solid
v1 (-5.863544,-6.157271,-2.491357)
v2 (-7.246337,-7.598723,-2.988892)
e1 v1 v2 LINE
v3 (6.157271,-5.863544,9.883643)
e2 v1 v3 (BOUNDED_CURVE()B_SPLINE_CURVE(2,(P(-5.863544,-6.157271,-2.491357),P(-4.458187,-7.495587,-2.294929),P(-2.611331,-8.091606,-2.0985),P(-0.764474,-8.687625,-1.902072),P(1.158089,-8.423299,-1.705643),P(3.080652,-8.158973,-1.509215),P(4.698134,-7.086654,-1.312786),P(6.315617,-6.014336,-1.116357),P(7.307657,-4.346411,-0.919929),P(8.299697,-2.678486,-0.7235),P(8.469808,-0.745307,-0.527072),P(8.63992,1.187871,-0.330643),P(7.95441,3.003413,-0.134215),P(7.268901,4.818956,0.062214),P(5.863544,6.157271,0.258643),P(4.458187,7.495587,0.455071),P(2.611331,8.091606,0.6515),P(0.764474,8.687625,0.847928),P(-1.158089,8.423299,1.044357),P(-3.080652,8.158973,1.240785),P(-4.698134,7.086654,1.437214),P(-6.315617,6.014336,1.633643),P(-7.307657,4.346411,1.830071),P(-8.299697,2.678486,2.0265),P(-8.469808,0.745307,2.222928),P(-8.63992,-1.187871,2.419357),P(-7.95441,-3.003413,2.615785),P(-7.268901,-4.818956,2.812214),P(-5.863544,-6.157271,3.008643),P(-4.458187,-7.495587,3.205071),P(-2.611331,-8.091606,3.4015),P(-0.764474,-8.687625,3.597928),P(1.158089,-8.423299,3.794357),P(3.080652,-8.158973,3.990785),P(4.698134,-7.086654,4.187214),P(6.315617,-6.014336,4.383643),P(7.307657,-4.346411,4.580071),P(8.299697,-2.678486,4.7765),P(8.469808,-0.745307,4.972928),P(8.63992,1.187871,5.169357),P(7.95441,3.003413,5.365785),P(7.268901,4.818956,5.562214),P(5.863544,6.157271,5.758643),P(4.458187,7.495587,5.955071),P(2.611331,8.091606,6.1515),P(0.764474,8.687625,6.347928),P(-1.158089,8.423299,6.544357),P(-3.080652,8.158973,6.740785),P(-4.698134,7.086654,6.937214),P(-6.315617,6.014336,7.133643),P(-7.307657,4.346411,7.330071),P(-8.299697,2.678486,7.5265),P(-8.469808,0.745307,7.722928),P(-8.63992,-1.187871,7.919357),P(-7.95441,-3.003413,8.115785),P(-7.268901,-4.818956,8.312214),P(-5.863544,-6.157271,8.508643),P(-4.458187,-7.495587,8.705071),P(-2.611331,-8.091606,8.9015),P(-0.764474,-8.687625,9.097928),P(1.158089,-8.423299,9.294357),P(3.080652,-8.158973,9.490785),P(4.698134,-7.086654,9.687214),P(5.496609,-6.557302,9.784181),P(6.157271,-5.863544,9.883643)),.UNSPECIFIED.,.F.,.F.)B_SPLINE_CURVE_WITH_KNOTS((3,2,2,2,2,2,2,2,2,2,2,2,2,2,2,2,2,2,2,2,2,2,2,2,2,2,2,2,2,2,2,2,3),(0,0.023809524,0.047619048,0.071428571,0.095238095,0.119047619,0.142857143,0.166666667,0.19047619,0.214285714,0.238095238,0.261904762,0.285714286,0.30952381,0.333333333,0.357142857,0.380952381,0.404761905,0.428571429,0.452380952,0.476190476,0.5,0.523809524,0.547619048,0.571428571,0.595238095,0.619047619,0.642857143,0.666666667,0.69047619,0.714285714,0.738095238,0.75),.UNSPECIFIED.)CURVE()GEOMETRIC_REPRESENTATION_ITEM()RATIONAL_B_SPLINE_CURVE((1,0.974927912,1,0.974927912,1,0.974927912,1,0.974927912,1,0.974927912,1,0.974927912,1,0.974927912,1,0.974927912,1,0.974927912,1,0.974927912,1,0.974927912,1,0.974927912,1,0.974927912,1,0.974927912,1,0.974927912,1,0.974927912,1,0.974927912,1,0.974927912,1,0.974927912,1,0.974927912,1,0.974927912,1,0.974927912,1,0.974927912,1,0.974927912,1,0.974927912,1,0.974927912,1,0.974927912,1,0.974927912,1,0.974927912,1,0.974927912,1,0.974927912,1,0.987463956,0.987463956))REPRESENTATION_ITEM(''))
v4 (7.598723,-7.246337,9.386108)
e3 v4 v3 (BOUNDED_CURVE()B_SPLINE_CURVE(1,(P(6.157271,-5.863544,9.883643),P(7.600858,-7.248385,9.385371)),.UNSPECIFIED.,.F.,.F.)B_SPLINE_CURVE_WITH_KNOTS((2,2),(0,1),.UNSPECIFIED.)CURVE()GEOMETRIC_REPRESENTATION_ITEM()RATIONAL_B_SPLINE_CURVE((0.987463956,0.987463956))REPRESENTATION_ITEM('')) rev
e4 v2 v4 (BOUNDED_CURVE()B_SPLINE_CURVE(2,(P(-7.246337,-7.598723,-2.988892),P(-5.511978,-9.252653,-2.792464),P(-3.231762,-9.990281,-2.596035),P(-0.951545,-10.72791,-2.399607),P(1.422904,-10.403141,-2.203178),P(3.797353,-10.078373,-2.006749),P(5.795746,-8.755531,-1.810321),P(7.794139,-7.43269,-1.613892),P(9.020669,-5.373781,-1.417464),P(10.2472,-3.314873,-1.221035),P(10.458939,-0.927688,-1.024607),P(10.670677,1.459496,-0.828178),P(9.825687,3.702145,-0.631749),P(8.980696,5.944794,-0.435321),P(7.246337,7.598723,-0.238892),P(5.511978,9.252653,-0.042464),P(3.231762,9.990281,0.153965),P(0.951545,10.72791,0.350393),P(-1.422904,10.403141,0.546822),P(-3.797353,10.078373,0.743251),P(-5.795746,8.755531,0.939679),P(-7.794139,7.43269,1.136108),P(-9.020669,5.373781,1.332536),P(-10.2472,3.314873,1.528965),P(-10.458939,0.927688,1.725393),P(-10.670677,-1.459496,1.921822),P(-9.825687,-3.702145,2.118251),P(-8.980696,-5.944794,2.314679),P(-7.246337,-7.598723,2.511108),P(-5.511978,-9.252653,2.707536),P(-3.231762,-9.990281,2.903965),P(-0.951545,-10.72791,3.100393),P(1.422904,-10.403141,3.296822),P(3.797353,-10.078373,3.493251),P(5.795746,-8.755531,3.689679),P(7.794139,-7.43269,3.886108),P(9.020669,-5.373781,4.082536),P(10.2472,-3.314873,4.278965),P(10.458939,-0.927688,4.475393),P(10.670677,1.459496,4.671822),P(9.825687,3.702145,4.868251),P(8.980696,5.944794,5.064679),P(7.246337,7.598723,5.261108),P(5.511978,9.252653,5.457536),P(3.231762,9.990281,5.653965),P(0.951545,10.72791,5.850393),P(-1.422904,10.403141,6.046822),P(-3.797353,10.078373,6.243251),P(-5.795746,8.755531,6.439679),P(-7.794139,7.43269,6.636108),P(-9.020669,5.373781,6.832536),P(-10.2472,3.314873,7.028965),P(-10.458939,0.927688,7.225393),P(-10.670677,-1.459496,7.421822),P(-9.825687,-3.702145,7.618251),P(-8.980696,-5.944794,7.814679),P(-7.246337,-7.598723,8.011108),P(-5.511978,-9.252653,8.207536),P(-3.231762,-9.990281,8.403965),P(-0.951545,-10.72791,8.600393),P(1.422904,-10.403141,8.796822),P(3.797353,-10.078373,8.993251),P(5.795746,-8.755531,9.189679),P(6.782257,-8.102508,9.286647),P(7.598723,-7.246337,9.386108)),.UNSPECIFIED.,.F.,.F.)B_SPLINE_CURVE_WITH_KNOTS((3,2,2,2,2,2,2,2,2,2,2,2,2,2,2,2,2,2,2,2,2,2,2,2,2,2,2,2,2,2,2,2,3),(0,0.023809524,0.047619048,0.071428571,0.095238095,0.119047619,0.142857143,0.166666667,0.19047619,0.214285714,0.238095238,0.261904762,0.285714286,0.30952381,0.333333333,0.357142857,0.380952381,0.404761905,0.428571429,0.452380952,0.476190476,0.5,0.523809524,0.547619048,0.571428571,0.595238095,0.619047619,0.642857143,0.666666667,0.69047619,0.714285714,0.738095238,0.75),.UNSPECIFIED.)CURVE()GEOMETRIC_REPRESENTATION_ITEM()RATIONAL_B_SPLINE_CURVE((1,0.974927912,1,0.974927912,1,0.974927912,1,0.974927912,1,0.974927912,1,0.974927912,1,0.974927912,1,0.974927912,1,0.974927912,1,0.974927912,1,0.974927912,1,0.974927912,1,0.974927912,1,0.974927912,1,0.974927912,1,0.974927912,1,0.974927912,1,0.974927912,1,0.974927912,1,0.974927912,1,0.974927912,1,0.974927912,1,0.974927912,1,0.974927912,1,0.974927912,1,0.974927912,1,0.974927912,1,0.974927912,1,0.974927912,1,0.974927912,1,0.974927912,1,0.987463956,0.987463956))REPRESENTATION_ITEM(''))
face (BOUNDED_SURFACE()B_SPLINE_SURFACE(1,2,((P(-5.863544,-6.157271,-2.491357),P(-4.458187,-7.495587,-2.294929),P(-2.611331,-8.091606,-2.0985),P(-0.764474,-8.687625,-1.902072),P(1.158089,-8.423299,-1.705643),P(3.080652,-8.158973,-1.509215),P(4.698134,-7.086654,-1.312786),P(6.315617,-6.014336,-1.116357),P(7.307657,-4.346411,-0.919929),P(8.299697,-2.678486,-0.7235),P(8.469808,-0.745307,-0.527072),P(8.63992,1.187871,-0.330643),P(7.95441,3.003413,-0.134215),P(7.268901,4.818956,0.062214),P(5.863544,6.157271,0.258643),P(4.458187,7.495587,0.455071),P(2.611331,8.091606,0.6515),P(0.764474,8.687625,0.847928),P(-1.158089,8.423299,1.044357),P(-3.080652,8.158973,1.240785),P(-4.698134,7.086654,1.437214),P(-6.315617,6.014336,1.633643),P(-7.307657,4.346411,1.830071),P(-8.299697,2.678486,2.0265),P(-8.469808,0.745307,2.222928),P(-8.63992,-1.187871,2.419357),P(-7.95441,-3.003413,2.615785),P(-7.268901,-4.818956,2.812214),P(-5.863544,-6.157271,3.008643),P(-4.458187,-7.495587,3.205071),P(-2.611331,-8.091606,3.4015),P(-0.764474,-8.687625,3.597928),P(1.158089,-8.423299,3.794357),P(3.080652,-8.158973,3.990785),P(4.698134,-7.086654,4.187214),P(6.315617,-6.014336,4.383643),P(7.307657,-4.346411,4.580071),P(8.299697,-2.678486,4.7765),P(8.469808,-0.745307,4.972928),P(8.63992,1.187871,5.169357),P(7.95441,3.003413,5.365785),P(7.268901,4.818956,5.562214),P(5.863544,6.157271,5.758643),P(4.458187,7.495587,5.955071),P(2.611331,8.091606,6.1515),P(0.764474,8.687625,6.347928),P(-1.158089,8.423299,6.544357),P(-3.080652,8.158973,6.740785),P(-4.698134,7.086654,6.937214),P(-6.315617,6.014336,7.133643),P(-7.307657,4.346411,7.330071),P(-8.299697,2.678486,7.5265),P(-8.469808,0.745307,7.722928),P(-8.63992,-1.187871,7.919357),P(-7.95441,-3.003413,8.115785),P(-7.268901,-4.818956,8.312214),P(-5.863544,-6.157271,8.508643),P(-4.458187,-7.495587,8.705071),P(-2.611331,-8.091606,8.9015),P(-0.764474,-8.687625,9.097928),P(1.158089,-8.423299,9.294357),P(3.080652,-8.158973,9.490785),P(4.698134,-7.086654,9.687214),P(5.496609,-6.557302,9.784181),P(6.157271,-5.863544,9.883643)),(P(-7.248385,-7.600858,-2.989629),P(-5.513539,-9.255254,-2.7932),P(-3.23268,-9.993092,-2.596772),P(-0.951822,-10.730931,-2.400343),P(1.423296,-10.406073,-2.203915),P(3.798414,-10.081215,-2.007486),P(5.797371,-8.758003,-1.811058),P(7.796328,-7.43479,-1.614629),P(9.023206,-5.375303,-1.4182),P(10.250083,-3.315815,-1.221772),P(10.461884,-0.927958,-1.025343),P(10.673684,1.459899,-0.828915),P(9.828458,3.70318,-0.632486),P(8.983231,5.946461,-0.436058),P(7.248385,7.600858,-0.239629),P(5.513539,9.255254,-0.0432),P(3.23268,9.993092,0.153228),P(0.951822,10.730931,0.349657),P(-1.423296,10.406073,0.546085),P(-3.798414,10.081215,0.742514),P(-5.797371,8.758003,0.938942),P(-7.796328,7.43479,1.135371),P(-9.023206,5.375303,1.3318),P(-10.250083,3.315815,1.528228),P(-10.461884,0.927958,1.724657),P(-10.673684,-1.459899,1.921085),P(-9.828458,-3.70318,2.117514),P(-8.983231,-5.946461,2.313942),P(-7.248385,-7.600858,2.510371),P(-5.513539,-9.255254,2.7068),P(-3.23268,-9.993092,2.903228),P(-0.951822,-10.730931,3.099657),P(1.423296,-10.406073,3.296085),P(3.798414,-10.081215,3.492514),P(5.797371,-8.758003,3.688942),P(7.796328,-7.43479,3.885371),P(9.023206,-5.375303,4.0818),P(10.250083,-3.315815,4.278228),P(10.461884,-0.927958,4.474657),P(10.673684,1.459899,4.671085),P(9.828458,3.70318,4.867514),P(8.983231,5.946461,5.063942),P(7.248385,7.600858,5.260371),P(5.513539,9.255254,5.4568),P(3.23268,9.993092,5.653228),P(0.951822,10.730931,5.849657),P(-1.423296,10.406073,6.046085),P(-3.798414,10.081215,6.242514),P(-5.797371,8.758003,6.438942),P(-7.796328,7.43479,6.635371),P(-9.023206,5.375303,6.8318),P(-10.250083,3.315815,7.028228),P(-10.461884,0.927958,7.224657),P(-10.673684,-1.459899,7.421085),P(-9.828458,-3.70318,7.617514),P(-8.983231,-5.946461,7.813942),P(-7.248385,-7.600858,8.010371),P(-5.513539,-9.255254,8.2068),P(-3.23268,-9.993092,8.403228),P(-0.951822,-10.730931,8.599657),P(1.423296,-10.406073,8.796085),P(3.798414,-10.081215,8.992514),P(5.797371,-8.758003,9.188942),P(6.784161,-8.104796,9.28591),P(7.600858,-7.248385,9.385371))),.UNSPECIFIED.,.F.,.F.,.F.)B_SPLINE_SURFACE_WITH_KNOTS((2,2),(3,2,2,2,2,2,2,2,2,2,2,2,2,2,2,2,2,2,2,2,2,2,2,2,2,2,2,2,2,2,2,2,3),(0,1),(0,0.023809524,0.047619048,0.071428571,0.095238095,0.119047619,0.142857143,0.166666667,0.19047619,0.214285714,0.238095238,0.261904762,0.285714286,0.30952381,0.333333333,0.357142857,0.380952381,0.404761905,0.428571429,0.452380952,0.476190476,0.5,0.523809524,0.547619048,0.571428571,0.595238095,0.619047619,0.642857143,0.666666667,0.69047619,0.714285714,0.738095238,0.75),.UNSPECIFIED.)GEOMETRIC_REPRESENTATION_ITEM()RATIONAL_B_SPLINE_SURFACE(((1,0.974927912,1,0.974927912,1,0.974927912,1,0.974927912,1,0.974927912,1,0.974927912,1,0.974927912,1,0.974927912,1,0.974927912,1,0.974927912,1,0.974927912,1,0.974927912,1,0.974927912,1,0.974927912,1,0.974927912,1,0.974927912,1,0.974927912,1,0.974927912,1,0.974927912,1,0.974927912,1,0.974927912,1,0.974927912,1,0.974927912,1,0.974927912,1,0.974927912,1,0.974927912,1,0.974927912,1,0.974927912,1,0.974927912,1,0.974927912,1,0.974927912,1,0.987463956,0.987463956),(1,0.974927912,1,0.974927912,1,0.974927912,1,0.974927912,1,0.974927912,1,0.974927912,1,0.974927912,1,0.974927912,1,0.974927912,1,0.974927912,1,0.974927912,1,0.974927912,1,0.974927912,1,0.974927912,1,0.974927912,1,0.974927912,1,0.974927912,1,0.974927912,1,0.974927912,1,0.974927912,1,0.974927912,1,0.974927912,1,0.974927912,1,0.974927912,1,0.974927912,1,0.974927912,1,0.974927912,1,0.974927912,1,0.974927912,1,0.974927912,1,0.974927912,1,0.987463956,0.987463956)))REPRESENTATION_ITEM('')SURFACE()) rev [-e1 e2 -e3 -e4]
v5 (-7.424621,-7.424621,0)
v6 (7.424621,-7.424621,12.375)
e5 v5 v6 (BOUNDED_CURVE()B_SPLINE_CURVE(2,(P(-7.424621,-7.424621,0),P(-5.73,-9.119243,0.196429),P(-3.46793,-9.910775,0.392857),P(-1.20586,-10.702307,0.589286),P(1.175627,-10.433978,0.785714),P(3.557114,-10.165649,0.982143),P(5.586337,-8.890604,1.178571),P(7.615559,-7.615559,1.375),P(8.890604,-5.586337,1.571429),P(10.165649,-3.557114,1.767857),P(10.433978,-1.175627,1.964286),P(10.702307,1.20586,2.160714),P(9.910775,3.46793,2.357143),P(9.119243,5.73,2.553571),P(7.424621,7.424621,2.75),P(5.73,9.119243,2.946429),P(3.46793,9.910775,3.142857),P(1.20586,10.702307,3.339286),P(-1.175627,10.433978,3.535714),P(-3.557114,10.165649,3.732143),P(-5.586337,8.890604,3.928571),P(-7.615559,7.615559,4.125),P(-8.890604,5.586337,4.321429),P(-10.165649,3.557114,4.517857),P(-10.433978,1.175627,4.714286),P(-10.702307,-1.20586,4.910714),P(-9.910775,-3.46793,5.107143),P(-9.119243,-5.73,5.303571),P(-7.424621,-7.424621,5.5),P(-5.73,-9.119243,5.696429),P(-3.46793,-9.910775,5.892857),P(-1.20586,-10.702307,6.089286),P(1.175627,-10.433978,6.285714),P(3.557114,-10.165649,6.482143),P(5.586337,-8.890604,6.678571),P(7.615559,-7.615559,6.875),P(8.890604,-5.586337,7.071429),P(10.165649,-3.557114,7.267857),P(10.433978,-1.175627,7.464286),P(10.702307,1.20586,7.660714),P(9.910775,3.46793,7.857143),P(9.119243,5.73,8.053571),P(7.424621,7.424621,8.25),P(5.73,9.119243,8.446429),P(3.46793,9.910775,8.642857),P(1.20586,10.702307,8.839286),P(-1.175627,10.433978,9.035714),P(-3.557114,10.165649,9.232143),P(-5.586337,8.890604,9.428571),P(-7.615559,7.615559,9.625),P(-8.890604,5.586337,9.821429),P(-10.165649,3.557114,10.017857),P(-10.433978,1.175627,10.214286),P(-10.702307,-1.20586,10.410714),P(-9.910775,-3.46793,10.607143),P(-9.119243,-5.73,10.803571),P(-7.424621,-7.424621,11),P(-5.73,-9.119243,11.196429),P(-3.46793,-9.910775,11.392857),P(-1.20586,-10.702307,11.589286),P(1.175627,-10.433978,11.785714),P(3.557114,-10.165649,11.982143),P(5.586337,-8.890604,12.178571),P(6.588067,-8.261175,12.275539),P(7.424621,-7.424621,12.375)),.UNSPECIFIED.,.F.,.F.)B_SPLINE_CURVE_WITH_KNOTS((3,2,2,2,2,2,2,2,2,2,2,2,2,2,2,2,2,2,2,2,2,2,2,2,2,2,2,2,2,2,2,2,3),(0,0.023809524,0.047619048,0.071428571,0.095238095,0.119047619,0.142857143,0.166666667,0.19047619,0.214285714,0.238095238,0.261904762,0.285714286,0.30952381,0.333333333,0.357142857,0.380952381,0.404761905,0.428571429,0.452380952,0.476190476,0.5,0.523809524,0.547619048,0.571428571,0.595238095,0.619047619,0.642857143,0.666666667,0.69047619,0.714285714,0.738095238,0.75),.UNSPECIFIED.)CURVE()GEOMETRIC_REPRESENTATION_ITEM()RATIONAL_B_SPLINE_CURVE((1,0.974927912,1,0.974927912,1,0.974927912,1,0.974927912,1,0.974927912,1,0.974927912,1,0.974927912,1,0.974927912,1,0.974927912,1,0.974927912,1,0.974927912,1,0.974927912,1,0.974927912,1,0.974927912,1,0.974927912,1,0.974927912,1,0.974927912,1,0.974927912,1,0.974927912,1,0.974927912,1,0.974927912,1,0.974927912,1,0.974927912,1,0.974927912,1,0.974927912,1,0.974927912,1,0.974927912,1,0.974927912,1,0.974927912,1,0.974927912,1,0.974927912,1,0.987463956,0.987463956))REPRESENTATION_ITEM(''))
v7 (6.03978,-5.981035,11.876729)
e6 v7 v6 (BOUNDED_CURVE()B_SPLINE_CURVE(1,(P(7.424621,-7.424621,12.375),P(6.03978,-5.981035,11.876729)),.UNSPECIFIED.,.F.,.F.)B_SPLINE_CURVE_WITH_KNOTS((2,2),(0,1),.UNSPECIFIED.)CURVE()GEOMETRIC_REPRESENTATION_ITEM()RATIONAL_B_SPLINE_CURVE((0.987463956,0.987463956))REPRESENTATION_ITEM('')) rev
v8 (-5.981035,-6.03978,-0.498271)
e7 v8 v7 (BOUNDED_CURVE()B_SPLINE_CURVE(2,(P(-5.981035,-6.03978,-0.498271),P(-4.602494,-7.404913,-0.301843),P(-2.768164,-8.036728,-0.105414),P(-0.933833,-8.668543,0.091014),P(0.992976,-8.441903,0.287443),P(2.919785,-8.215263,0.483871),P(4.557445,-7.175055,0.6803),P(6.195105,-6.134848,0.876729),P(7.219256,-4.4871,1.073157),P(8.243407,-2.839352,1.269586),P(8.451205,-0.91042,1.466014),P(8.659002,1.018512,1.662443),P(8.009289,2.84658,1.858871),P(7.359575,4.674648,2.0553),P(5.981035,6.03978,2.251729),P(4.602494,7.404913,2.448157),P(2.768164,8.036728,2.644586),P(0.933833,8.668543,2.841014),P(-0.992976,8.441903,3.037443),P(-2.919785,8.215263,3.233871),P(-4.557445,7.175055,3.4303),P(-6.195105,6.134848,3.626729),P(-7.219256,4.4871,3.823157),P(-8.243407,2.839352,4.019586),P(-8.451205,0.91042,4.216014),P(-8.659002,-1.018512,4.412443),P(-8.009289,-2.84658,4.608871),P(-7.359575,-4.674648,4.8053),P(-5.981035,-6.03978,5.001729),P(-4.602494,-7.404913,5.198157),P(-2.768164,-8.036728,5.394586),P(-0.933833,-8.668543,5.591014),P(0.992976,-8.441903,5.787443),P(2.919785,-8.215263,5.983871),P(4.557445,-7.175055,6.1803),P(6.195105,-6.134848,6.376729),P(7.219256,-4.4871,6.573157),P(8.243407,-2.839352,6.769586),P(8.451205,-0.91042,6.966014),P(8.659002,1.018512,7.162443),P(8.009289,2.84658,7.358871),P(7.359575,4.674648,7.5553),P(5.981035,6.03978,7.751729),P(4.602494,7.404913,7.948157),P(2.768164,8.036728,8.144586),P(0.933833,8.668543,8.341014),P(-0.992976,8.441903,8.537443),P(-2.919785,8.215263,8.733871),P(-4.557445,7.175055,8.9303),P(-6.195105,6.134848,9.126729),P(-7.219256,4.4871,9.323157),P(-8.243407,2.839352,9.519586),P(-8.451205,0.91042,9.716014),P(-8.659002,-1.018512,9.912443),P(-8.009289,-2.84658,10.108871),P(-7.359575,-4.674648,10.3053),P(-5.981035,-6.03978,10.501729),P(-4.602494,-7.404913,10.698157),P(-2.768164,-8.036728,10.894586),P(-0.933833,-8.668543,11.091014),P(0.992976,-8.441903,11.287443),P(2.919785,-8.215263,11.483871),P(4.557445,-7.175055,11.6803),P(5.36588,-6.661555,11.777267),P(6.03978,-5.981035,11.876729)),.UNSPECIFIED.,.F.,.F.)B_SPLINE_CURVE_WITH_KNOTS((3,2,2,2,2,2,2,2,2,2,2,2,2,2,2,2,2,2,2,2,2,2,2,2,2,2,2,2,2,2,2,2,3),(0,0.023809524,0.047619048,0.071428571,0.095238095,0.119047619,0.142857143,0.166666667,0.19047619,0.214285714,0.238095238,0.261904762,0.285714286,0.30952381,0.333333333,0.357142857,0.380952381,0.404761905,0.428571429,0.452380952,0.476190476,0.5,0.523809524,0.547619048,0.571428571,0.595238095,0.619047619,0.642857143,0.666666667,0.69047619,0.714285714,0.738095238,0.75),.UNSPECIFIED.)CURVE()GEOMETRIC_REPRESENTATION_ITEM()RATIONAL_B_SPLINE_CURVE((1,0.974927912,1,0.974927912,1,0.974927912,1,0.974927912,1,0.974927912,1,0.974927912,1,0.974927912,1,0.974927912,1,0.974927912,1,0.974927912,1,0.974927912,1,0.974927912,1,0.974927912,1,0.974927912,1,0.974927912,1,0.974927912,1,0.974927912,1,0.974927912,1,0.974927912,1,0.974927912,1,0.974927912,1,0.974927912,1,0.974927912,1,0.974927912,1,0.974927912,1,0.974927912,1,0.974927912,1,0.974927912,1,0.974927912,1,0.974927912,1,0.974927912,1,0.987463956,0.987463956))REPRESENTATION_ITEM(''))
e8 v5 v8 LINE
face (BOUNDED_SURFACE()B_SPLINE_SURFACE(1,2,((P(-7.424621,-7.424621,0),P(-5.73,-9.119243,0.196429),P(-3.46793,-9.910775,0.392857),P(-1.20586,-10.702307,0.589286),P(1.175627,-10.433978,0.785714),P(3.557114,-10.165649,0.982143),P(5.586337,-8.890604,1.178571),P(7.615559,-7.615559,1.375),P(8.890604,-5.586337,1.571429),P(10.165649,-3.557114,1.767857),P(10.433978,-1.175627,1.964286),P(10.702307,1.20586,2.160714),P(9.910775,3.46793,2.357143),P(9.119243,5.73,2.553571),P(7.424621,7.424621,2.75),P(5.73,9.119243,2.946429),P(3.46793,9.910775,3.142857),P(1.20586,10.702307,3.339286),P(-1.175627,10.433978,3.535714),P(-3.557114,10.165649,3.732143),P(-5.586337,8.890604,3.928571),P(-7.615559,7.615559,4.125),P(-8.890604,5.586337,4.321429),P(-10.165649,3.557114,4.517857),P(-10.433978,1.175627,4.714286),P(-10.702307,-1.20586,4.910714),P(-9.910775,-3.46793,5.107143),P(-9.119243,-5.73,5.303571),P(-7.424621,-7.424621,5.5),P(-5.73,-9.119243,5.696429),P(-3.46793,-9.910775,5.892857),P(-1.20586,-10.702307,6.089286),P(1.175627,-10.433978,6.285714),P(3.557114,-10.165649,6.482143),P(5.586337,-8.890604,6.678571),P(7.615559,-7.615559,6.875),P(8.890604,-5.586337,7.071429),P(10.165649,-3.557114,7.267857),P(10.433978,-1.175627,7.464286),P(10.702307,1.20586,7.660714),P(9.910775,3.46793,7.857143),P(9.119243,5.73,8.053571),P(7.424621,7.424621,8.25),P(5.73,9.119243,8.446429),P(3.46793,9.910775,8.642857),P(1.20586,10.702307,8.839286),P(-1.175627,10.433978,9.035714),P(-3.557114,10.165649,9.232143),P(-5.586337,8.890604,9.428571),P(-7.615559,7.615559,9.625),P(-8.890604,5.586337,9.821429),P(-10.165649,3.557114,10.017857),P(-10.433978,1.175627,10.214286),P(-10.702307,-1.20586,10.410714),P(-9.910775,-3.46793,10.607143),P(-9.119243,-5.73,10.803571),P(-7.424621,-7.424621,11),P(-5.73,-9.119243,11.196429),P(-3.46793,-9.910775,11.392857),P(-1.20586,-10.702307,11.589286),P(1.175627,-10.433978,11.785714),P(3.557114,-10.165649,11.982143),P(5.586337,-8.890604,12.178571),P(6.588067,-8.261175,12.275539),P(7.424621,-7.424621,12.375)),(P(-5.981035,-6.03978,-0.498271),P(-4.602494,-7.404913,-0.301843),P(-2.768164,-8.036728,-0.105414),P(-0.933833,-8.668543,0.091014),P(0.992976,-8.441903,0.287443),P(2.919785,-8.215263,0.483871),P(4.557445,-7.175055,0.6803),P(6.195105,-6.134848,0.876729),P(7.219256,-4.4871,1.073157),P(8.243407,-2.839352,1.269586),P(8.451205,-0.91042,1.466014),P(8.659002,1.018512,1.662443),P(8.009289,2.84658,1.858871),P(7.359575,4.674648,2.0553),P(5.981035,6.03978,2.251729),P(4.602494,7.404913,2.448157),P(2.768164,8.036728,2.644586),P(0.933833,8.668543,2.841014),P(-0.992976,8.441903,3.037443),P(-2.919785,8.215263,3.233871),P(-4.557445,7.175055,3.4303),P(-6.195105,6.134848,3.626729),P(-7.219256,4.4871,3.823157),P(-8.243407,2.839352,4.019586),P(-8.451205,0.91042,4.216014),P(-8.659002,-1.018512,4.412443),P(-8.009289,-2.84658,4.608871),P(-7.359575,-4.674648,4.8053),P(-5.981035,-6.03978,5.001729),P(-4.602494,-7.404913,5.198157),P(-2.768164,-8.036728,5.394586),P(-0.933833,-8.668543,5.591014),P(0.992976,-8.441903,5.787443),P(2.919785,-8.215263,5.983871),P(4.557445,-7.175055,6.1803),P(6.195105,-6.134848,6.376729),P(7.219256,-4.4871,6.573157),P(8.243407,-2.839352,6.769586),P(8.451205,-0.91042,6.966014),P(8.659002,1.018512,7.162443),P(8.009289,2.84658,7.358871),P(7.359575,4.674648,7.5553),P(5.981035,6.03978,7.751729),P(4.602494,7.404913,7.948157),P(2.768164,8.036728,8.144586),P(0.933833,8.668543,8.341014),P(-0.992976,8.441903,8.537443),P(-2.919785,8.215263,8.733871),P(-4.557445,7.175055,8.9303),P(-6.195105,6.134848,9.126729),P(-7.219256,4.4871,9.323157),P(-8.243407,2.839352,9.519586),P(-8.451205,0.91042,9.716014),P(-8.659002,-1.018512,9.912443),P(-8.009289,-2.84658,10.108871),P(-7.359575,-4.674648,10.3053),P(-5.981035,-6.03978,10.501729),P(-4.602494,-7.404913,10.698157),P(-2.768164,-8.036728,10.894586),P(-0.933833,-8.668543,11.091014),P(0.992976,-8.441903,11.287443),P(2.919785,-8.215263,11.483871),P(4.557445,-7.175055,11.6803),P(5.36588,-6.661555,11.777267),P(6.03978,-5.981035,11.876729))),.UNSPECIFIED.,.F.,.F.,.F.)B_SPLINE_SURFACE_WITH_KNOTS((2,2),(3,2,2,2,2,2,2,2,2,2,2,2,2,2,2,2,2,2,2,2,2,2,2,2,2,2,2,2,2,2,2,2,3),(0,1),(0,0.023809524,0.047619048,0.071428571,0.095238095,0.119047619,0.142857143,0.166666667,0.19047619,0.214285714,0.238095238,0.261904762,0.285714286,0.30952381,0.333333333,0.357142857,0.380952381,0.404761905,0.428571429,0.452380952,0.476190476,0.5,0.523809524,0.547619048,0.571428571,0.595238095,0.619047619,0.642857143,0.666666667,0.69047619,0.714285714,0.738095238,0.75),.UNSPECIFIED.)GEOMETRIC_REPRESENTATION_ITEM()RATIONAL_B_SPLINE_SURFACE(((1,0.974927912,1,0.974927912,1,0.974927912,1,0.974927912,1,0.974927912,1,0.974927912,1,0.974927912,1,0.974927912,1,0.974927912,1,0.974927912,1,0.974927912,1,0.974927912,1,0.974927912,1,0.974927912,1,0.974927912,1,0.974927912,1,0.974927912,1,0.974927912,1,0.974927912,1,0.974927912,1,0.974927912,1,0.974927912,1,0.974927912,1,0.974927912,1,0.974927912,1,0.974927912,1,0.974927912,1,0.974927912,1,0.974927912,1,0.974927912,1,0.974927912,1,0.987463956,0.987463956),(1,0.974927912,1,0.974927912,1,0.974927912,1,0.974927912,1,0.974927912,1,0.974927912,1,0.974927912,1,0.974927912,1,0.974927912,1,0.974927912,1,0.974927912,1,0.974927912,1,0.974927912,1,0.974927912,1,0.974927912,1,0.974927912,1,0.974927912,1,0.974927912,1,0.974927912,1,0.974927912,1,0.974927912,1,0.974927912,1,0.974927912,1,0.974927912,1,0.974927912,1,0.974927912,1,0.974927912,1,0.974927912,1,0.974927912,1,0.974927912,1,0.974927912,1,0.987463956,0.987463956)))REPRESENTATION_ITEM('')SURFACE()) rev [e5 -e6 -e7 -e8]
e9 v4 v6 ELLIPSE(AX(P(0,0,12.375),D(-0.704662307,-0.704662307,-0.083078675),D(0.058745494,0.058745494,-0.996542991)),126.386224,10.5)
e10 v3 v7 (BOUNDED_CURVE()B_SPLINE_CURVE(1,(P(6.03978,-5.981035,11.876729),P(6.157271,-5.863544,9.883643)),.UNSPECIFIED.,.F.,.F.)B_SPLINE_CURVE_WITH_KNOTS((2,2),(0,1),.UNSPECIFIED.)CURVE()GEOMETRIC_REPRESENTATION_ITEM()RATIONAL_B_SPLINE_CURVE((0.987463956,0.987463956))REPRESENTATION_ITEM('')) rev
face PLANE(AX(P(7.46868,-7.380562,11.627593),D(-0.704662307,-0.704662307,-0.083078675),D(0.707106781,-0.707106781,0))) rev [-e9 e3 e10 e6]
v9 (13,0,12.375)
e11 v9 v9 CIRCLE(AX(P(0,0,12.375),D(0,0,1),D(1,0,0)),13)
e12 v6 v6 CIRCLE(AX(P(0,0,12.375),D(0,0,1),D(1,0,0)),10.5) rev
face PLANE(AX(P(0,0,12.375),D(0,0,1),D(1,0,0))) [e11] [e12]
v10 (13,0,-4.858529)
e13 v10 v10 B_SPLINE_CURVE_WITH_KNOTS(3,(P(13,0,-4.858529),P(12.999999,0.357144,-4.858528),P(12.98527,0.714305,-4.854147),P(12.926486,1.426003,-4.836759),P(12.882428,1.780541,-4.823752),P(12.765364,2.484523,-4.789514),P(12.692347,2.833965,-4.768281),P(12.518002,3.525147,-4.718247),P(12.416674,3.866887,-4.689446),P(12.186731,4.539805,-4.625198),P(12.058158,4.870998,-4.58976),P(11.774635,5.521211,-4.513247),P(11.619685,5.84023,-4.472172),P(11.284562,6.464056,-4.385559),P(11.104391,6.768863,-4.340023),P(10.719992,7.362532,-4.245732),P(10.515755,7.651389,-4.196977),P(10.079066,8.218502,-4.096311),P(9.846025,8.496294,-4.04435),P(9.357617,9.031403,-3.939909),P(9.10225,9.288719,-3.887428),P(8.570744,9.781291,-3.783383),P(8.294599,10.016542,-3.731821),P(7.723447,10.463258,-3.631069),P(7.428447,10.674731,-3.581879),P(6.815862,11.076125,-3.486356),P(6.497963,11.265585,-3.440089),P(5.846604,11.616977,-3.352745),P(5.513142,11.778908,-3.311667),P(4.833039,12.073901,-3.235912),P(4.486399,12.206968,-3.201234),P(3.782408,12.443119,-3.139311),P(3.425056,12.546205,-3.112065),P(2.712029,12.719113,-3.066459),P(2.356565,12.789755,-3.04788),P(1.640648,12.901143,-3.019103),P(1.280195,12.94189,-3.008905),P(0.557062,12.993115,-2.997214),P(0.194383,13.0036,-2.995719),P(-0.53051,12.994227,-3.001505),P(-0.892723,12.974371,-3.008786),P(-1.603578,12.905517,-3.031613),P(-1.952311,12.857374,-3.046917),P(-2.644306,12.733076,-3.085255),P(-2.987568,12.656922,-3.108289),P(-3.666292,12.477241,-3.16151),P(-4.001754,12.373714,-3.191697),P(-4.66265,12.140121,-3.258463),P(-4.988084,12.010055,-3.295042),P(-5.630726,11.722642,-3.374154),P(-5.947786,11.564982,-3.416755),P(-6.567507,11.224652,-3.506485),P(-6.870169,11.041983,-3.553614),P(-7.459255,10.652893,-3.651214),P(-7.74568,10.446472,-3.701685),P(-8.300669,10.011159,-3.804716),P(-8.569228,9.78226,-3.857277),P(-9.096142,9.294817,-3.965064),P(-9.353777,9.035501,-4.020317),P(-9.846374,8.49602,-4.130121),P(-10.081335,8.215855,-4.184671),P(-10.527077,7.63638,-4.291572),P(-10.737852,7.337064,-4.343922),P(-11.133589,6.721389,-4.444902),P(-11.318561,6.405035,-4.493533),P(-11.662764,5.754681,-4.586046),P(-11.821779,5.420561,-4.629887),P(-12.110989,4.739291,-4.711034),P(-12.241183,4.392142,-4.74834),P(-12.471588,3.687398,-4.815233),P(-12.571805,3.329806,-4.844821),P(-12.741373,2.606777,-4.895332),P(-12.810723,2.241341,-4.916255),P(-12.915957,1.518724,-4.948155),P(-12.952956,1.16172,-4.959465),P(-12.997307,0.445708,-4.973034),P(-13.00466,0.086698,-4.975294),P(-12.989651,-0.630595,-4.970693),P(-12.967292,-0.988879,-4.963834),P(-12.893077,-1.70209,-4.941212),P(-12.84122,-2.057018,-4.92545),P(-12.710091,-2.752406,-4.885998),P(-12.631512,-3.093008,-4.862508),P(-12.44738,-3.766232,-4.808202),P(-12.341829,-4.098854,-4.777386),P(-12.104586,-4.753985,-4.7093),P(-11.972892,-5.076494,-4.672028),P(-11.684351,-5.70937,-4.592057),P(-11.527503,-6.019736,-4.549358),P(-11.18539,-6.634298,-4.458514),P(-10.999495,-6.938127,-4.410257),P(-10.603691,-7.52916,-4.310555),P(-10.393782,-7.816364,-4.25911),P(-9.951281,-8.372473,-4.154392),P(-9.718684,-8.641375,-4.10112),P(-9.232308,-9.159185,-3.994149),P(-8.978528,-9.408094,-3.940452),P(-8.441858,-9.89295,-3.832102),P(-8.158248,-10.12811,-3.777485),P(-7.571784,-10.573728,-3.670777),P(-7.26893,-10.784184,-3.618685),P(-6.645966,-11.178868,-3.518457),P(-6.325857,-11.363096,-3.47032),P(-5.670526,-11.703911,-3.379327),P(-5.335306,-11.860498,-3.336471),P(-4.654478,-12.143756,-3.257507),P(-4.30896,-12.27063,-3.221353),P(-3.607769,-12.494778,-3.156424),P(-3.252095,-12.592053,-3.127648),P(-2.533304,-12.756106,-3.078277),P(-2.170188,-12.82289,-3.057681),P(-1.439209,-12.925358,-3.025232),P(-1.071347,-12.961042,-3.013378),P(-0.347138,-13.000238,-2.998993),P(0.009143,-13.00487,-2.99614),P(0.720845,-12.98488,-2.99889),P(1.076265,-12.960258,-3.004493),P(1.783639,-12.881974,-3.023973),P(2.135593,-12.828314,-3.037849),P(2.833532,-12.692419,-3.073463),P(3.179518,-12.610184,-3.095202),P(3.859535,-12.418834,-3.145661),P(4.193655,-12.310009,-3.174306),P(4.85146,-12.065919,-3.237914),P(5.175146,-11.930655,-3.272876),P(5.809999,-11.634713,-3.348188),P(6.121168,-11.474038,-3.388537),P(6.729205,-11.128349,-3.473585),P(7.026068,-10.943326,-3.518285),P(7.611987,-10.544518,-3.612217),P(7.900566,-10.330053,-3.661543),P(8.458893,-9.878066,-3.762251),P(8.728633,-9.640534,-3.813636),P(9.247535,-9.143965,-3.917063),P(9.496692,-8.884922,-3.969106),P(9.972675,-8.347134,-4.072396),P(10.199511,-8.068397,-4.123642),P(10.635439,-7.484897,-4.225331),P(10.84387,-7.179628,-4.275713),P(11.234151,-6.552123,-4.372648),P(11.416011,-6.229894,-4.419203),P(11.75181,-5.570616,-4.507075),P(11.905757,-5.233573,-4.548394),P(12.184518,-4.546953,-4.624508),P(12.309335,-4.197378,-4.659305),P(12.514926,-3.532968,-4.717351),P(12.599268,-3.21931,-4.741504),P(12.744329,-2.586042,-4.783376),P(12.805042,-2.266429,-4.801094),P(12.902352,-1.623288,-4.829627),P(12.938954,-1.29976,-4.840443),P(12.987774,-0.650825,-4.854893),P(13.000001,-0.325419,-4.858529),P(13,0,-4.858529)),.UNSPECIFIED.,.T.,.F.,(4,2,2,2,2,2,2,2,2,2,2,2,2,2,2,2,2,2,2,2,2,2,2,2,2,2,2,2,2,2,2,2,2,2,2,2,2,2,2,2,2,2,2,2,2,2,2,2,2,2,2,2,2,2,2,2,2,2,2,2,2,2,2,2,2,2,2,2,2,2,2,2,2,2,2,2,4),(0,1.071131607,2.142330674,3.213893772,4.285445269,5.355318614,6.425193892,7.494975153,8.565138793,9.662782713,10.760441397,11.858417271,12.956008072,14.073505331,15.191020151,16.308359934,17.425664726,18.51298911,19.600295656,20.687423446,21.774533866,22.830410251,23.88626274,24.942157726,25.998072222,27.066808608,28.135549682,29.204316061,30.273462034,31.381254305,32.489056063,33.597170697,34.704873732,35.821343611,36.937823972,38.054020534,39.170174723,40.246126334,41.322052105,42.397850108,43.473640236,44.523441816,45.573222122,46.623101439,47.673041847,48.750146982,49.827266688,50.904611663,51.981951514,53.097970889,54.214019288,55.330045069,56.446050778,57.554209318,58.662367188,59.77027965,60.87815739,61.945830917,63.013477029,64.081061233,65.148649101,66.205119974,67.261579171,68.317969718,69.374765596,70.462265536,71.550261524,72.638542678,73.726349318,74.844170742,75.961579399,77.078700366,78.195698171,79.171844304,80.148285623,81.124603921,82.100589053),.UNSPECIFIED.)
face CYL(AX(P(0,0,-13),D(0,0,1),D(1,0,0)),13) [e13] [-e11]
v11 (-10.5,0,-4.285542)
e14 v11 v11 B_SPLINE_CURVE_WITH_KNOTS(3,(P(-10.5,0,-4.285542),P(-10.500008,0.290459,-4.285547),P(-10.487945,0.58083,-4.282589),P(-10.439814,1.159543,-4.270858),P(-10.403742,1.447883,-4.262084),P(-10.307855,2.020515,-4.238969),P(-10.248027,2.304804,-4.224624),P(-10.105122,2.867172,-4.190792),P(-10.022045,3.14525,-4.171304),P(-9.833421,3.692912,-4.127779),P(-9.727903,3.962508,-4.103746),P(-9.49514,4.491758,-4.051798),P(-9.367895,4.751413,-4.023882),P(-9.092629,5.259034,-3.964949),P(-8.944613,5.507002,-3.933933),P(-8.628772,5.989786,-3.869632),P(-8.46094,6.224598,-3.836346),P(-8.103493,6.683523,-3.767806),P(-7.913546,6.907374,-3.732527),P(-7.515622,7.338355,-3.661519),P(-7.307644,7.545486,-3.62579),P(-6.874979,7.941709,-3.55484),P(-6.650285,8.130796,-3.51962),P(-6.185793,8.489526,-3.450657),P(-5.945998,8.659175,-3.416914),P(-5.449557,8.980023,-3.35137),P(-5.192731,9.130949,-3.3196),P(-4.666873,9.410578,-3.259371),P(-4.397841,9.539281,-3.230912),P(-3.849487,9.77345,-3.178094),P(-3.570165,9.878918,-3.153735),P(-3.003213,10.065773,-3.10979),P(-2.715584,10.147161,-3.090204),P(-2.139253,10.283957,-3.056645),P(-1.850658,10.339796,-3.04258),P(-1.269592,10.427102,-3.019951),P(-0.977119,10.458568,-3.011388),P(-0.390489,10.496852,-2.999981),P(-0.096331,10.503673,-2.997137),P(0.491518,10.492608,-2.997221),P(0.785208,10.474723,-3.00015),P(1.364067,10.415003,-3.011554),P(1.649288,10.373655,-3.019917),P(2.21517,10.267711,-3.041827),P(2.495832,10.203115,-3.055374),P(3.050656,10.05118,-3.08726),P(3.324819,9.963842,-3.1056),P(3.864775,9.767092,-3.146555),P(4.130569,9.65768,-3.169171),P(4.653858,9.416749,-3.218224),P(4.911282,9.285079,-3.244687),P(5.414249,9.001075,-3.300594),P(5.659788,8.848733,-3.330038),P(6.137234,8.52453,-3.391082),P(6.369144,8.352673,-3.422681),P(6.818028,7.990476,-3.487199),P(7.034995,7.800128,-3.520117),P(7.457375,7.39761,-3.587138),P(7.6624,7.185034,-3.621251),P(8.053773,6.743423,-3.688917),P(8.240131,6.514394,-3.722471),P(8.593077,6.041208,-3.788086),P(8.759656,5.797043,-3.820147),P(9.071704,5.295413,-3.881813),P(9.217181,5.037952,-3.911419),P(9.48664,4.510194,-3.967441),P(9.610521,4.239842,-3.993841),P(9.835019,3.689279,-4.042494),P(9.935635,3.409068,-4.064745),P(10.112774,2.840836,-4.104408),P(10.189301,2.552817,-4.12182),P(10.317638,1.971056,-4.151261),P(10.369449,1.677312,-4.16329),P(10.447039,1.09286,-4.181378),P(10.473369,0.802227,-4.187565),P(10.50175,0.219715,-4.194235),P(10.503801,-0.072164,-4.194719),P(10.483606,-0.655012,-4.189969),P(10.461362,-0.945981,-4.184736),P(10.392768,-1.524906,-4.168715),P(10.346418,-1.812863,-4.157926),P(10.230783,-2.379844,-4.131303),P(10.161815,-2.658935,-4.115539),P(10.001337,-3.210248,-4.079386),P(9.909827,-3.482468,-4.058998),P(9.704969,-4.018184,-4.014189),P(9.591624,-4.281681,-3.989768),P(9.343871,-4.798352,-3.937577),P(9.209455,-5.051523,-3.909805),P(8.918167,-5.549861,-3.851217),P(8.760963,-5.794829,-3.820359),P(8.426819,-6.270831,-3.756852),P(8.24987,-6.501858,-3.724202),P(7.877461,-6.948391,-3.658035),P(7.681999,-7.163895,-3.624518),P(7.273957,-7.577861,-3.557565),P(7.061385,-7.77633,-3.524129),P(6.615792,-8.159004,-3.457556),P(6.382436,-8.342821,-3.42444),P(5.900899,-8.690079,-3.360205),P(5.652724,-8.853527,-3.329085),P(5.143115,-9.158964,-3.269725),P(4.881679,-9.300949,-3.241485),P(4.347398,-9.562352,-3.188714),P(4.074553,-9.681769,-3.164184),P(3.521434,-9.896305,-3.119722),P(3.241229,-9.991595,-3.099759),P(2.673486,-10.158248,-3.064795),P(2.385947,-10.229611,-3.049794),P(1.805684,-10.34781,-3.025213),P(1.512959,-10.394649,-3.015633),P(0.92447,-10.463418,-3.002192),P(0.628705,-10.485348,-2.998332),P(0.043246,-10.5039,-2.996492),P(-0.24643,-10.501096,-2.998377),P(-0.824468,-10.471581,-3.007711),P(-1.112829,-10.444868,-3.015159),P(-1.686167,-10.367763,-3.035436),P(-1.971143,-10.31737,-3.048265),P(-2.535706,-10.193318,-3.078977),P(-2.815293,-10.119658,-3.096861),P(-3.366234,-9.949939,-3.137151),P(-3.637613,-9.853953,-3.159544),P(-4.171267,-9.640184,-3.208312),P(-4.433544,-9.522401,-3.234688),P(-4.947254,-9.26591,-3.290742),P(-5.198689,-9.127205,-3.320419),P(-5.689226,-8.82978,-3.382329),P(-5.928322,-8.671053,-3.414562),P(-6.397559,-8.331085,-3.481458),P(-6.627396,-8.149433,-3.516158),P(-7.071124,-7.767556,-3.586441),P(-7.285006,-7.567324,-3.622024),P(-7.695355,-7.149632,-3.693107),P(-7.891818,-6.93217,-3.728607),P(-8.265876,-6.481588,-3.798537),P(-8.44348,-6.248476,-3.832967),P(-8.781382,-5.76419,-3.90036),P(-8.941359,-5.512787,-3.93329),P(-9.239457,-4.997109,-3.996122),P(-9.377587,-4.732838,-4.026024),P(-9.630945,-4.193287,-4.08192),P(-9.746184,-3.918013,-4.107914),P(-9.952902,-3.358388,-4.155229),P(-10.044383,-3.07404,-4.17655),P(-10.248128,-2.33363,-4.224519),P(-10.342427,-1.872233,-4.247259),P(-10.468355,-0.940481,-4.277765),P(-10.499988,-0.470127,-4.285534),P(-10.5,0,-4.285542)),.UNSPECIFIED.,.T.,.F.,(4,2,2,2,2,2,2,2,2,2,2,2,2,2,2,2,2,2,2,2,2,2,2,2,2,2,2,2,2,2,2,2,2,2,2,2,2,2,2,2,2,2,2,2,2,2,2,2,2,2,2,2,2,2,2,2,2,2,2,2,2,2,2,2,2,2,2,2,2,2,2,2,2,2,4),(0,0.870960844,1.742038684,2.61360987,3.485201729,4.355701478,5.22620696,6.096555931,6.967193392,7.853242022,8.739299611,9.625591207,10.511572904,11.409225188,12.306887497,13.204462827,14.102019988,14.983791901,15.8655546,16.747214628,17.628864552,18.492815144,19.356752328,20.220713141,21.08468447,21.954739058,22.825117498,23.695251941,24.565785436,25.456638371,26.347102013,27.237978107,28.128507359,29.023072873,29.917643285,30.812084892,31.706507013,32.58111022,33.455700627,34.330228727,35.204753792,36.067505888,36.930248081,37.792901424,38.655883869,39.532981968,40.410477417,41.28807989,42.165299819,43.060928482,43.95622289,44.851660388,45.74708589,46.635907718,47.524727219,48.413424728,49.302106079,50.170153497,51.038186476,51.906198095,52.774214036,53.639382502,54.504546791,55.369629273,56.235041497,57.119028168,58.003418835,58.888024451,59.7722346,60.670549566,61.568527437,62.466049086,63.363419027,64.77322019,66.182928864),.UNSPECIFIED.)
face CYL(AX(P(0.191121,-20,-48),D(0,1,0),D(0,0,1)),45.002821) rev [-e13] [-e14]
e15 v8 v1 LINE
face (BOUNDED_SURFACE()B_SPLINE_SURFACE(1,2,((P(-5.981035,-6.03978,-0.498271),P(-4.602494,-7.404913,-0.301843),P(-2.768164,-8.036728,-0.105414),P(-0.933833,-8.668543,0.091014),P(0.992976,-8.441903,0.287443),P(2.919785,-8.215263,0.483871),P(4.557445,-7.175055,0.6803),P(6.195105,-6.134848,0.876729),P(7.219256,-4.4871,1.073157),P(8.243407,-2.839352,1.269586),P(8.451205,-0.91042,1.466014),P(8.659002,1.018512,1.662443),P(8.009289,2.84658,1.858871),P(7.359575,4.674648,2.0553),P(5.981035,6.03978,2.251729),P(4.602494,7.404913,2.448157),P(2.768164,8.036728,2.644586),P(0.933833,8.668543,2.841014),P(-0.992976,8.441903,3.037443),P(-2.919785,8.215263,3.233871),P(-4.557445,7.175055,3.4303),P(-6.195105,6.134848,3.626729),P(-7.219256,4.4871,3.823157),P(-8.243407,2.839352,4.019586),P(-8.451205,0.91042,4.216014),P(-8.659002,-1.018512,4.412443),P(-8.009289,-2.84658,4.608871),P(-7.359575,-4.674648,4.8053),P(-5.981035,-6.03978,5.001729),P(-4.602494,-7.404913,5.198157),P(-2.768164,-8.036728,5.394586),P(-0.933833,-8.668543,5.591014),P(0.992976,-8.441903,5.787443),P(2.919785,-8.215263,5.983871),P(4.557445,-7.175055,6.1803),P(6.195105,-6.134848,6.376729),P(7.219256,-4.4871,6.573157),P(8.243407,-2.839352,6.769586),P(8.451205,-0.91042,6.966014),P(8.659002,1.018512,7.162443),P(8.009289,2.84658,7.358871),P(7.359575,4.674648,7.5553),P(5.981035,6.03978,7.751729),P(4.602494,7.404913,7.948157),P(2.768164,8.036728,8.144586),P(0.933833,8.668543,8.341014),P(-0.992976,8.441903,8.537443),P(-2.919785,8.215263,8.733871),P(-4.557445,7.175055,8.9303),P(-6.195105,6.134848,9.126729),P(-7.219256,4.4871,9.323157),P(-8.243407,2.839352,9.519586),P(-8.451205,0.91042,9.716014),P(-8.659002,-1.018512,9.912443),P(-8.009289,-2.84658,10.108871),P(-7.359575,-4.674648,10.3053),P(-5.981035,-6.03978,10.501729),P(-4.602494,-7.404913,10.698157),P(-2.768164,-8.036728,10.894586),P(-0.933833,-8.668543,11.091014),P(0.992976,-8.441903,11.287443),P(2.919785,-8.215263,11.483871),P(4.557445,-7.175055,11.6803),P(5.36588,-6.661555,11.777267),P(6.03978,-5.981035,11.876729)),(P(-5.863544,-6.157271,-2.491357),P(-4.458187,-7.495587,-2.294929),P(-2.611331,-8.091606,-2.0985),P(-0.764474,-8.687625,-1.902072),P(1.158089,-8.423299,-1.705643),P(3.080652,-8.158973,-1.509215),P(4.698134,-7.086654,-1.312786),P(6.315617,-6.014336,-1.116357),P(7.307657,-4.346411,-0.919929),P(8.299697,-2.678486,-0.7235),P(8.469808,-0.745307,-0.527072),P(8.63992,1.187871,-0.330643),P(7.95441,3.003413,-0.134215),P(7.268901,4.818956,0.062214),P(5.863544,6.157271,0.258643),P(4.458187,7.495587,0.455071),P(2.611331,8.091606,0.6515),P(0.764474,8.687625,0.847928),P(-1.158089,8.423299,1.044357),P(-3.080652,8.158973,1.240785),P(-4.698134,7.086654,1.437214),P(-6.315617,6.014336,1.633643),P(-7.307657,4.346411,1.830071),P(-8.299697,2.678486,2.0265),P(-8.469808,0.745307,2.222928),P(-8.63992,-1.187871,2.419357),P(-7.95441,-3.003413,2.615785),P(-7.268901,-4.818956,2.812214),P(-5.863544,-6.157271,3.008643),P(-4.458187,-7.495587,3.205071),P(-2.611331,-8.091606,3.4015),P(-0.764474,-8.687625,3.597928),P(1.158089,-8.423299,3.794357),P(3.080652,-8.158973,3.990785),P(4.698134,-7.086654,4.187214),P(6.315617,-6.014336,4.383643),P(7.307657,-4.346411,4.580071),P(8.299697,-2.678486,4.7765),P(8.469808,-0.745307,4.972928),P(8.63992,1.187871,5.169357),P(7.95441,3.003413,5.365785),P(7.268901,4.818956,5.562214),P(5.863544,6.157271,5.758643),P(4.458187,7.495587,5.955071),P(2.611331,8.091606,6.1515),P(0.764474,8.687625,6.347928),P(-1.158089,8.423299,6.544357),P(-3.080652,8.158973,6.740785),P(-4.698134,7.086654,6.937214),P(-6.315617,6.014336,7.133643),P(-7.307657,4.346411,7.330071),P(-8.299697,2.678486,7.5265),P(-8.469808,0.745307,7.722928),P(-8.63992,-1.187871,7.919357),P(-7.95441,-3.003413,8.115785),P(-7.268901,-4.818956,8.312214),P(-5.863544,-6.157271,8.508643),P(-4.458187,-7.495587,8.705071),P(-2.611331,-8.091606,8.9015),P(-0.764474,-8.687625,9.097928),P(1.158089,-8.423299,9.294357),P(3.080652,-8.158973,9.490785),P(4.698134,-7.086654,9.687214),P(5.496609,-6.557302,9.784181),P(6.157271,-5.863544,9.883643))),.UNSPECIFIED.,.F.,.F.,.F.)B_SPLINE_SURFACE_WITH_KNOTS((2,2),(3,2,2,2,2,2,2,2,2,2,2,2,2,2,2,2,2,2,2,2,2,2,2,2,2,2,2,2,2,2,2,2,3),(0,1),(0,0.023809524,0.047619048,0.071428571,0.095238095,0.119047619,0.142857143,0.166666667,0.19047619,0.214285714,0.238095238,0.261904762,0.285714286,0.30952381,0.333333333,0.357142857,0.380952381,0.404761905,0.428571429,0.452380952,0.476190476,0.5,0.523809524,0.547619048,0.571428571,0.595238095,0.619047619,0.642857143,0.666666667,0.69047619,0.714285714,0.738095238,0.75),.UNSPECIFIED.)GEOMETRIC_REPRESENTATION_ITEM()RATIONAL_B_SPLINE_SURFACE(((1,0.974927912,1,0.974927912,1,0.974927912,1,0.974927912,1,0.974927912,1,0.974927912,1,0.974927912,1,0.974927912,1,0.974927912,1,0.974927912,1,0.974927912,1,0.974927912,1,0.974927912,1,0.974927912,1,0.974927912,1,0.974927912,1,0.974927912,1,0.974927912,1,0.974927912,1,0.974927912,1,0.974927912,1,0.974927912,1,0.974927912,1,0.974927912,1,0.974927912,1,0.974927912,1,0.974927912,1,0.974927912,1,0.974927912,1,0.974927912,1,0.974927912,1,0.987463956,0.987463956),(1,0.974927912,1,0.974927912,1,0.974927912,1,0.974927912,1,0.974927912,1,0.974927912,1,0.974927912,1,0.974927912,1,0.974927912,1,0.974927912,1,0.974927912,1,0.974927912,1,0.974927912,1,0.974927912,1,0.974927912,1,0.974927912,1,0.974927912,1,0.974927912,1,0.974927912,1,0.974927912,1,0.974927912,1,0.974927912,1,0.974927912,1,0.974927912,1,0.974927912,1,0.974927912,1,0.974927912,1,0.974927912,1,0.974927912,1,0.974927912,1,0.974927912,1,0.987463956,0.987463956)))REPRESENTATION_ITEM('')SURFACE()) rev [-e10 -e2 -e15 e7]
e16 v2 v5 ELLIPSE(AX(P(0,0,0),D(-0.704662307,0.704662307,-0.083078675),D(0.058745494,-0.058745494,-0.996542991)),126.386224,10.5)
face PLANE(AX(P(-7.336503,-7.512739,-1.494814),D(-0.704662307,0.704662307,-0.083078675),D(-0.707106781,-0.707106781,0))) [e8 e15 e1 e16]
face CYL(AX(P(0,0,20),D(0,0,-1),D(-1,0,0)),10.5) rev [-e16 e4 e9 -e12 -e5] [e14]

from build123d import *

# Parameters (mm, degrees)
EXTRUDE_1_DEPTH          = 12.375
EXTRUDE_1_DEPTH_BACK     = 13
SKETCH_1_R               = 13
CUT_EXTRUDE_1_DEPTH      = 20
CUT_EXTRUDE_1_DEPTH_BACK = 10
SKETCH_2_R               = 10.5
SWEEP_1_PITCH            = 5.5
CUT_EXTRUDE_2_DEPTH      = 20
CUT_EXTRUDE_2_DEPTH_BACK = 20
SKETCH_6_R               = 45.002821291


with BuildPart() as part:
    # 草图1 → 凸台-拉伸1 (new, two sides: drawn at the far end of the back side and taken through both)
    with BuildSketch(Plane.XY.offset(-EXTRUDE_1_DEPTH_BACK)):
        Circle(SKETCH_1_R)
    extrude(amount=EXTRUDE_1_DEPTH + EXTRUDE_1_DEPTH_BACK)

    # 草图2 → 切除-拉伸1 (cut, two sides: drawn at the far end of the back side and taken through both)
    with BuildSketch(Plane.XY.offset(-CUT_EXTRUDE_1_DEPTH_BACK)):
        Circle(SKETCH_2_R)
    extrude(amount=CUT_EXTRUDE_1_DEPTH + CUT_EXTRUDE_1_DEPTH_BACK, mode=Mode.SUBTRACT)

    # 扫描1: the profile of 草图4 screwed along a right-hand helix of 2.25 turns, 14 arcs to a turn; built about Z, then put on its axis
    sweep_1_z = Axis((0, 0, 0), (0, 0, 1))
    sweep_1_corners = [(10.5, 0, 0), (10.5, 0.249236025, -2.989628974), (8.5, 0.207696687, -2.491357479), (8.5, 0.041539337, -0.498271496)]
    with BuildLine(mode=Mode.PRIVATE) as sweep_1_profile:
        Line(sweep_1_corners[0], sweep_1_corners[1])
        Line(sweep_1_corners[1], sweep_1_corners[2])
        Line(sweep_1_corners[2], sweep_1_corners[3])
        Line(sweep_1_corners[3], sweep_1_corners[0])
    sweep_1_cap = Face(sweep_1_profile.wire())
    sweep_1_turn_angles = [0, 12.857142857, 25.714285714, 38.571428571, 51.428571429, 64.285714286, 77.142857143, 90, 102.857142857, 115.714285714, 128.571428571, 141.428571429, 154.285714286, 167.142857143, 180, 192.857142857, 205.714285714, 218.571428571, 231.428571429, 244.285714286, 257.142857143, 270, 282.857142857, 295.714285714, 308.571428571, 321.428571429, 334.285714286, 347.142857143, 360]
    sweep_1_turn_weights = [1, 0.9749279121818236, 1, 0.9749279121818236, 1, 0.9749279121818236, 1, 0.9749279121818236, 1, 0.9749279121818236, 1, 0.9749279121818236, 1, 0.9749279121818236, 1, 0.9749279121818236, 1, 0.9749279121818236, 1, 0.9749279121818236, 1, 0.9749279121818236, 1, 0.9749279121818237, 1, 0.9749279121818236, 1, 0.9749279121818236, 1]
    sweep_1_turn_rails = [Edge.make_bspline([Vector(p[0], p[1], 0).rotate(sweep_1_z, sweep_1_turn_angles[k]) / sweep_1_turn_weights[k] + Vector(0, 0, p[2] + SWEEP_1_PITCH * sweep_1_turn_angles[k] / 360) for k in range(29)], [0, 0, 0, 1, 1, 2, 2, 3, 3, 4, 4, 5, 5, 6, 6, 7, 7, 8, 8, 9, 9, 10, 10, 11, 11, 12, 12, 13, 13, 14, 14, 14], 2, sweep_1_turn_weights) for p in sweep_1_corners]
    sweep_1_turn_sides = [Face.make_surface_from_curves(sweep_1_turn_rails[p[0]], sweep_1_turn_rails[p[1]]) for p in [(0, 1), (1, 2), (2, 3), (3, 0)]]
    sweep_1_last_angles = [720, 732.857142857, 745.714285714, 758.571428571, 771.428571429, 784.285714286, 797.142857143, 803.571428571, 810]
    sweep_1_last_weights = [1, 0.9749279121818237, 1, 0.9749279121818235, 1, 0.9749279121818237, 1, 0.9937122098932412, 1]
    sweep_1_last_rails = [Edge.make_bspline([Vector(p[0], p[1], 0).rotate(sweep_1_z, sweep_1_last_angles[k]) / sweep_1_last_weights[k] + Vector(0, 0, p[2] + SWEEP_1_PITCH * sweep_1_last_angles[k] / 360) for k in range(9)], [0, 0, 0, 1, 1, 2, 2, 3, 3, 4, 4, 4], 2, sweep_1_last_weights) for p in sweep_1_corners]
    sweep_1_last_sides = [Face.make_surface_from_curves(sweep_1_last_rails[p[0]], sweep_1_last_rails[p[1]]) for p in [(0, 1), (1, 2), (2, 3), (3, 0)]]
    sweep_1 = Plane(origin=(0, 0, 0), x_dir=(-0.7071067811865414, -0.7071067811865537, 0), z_dir=(0, 0, 1)) * Solid(Shell([*[p.moved(Location((0, 0, SWEEP_1_PITCH * i))) for i in range(2) for p in sweep_1_turn_sides], *sweep_1_last_sides, sweep_1_cap, sweep_1_cap.rotate(sweep_1_z, 810).moved(Location((0, 0, SWEEP_1_PITCH * 810 / 360)))]))
    add(sweep_1)

    # 草图6 → 切除-拉伸2 (cut, two sides: drawn at the far end of the back side and taken through both)
    with BuildSketch(Plane(origin=(0, 0, 0), x_dir=(-1, 0, 0), z_dir=(0, -1, 0)).offset(-CUT_EXTRUDE_2_DEPTH_BACK)):
        with Locations((-0.191121104, 48)):
            Circle(SKETCH_6_R)
    extrude(amount=CUT_EXTRUDE_2_DEPTH + CUT_EXTRUDE_2_DEPTH_BACK, mode=Mode.SUBTRACT)


solid = part.part
